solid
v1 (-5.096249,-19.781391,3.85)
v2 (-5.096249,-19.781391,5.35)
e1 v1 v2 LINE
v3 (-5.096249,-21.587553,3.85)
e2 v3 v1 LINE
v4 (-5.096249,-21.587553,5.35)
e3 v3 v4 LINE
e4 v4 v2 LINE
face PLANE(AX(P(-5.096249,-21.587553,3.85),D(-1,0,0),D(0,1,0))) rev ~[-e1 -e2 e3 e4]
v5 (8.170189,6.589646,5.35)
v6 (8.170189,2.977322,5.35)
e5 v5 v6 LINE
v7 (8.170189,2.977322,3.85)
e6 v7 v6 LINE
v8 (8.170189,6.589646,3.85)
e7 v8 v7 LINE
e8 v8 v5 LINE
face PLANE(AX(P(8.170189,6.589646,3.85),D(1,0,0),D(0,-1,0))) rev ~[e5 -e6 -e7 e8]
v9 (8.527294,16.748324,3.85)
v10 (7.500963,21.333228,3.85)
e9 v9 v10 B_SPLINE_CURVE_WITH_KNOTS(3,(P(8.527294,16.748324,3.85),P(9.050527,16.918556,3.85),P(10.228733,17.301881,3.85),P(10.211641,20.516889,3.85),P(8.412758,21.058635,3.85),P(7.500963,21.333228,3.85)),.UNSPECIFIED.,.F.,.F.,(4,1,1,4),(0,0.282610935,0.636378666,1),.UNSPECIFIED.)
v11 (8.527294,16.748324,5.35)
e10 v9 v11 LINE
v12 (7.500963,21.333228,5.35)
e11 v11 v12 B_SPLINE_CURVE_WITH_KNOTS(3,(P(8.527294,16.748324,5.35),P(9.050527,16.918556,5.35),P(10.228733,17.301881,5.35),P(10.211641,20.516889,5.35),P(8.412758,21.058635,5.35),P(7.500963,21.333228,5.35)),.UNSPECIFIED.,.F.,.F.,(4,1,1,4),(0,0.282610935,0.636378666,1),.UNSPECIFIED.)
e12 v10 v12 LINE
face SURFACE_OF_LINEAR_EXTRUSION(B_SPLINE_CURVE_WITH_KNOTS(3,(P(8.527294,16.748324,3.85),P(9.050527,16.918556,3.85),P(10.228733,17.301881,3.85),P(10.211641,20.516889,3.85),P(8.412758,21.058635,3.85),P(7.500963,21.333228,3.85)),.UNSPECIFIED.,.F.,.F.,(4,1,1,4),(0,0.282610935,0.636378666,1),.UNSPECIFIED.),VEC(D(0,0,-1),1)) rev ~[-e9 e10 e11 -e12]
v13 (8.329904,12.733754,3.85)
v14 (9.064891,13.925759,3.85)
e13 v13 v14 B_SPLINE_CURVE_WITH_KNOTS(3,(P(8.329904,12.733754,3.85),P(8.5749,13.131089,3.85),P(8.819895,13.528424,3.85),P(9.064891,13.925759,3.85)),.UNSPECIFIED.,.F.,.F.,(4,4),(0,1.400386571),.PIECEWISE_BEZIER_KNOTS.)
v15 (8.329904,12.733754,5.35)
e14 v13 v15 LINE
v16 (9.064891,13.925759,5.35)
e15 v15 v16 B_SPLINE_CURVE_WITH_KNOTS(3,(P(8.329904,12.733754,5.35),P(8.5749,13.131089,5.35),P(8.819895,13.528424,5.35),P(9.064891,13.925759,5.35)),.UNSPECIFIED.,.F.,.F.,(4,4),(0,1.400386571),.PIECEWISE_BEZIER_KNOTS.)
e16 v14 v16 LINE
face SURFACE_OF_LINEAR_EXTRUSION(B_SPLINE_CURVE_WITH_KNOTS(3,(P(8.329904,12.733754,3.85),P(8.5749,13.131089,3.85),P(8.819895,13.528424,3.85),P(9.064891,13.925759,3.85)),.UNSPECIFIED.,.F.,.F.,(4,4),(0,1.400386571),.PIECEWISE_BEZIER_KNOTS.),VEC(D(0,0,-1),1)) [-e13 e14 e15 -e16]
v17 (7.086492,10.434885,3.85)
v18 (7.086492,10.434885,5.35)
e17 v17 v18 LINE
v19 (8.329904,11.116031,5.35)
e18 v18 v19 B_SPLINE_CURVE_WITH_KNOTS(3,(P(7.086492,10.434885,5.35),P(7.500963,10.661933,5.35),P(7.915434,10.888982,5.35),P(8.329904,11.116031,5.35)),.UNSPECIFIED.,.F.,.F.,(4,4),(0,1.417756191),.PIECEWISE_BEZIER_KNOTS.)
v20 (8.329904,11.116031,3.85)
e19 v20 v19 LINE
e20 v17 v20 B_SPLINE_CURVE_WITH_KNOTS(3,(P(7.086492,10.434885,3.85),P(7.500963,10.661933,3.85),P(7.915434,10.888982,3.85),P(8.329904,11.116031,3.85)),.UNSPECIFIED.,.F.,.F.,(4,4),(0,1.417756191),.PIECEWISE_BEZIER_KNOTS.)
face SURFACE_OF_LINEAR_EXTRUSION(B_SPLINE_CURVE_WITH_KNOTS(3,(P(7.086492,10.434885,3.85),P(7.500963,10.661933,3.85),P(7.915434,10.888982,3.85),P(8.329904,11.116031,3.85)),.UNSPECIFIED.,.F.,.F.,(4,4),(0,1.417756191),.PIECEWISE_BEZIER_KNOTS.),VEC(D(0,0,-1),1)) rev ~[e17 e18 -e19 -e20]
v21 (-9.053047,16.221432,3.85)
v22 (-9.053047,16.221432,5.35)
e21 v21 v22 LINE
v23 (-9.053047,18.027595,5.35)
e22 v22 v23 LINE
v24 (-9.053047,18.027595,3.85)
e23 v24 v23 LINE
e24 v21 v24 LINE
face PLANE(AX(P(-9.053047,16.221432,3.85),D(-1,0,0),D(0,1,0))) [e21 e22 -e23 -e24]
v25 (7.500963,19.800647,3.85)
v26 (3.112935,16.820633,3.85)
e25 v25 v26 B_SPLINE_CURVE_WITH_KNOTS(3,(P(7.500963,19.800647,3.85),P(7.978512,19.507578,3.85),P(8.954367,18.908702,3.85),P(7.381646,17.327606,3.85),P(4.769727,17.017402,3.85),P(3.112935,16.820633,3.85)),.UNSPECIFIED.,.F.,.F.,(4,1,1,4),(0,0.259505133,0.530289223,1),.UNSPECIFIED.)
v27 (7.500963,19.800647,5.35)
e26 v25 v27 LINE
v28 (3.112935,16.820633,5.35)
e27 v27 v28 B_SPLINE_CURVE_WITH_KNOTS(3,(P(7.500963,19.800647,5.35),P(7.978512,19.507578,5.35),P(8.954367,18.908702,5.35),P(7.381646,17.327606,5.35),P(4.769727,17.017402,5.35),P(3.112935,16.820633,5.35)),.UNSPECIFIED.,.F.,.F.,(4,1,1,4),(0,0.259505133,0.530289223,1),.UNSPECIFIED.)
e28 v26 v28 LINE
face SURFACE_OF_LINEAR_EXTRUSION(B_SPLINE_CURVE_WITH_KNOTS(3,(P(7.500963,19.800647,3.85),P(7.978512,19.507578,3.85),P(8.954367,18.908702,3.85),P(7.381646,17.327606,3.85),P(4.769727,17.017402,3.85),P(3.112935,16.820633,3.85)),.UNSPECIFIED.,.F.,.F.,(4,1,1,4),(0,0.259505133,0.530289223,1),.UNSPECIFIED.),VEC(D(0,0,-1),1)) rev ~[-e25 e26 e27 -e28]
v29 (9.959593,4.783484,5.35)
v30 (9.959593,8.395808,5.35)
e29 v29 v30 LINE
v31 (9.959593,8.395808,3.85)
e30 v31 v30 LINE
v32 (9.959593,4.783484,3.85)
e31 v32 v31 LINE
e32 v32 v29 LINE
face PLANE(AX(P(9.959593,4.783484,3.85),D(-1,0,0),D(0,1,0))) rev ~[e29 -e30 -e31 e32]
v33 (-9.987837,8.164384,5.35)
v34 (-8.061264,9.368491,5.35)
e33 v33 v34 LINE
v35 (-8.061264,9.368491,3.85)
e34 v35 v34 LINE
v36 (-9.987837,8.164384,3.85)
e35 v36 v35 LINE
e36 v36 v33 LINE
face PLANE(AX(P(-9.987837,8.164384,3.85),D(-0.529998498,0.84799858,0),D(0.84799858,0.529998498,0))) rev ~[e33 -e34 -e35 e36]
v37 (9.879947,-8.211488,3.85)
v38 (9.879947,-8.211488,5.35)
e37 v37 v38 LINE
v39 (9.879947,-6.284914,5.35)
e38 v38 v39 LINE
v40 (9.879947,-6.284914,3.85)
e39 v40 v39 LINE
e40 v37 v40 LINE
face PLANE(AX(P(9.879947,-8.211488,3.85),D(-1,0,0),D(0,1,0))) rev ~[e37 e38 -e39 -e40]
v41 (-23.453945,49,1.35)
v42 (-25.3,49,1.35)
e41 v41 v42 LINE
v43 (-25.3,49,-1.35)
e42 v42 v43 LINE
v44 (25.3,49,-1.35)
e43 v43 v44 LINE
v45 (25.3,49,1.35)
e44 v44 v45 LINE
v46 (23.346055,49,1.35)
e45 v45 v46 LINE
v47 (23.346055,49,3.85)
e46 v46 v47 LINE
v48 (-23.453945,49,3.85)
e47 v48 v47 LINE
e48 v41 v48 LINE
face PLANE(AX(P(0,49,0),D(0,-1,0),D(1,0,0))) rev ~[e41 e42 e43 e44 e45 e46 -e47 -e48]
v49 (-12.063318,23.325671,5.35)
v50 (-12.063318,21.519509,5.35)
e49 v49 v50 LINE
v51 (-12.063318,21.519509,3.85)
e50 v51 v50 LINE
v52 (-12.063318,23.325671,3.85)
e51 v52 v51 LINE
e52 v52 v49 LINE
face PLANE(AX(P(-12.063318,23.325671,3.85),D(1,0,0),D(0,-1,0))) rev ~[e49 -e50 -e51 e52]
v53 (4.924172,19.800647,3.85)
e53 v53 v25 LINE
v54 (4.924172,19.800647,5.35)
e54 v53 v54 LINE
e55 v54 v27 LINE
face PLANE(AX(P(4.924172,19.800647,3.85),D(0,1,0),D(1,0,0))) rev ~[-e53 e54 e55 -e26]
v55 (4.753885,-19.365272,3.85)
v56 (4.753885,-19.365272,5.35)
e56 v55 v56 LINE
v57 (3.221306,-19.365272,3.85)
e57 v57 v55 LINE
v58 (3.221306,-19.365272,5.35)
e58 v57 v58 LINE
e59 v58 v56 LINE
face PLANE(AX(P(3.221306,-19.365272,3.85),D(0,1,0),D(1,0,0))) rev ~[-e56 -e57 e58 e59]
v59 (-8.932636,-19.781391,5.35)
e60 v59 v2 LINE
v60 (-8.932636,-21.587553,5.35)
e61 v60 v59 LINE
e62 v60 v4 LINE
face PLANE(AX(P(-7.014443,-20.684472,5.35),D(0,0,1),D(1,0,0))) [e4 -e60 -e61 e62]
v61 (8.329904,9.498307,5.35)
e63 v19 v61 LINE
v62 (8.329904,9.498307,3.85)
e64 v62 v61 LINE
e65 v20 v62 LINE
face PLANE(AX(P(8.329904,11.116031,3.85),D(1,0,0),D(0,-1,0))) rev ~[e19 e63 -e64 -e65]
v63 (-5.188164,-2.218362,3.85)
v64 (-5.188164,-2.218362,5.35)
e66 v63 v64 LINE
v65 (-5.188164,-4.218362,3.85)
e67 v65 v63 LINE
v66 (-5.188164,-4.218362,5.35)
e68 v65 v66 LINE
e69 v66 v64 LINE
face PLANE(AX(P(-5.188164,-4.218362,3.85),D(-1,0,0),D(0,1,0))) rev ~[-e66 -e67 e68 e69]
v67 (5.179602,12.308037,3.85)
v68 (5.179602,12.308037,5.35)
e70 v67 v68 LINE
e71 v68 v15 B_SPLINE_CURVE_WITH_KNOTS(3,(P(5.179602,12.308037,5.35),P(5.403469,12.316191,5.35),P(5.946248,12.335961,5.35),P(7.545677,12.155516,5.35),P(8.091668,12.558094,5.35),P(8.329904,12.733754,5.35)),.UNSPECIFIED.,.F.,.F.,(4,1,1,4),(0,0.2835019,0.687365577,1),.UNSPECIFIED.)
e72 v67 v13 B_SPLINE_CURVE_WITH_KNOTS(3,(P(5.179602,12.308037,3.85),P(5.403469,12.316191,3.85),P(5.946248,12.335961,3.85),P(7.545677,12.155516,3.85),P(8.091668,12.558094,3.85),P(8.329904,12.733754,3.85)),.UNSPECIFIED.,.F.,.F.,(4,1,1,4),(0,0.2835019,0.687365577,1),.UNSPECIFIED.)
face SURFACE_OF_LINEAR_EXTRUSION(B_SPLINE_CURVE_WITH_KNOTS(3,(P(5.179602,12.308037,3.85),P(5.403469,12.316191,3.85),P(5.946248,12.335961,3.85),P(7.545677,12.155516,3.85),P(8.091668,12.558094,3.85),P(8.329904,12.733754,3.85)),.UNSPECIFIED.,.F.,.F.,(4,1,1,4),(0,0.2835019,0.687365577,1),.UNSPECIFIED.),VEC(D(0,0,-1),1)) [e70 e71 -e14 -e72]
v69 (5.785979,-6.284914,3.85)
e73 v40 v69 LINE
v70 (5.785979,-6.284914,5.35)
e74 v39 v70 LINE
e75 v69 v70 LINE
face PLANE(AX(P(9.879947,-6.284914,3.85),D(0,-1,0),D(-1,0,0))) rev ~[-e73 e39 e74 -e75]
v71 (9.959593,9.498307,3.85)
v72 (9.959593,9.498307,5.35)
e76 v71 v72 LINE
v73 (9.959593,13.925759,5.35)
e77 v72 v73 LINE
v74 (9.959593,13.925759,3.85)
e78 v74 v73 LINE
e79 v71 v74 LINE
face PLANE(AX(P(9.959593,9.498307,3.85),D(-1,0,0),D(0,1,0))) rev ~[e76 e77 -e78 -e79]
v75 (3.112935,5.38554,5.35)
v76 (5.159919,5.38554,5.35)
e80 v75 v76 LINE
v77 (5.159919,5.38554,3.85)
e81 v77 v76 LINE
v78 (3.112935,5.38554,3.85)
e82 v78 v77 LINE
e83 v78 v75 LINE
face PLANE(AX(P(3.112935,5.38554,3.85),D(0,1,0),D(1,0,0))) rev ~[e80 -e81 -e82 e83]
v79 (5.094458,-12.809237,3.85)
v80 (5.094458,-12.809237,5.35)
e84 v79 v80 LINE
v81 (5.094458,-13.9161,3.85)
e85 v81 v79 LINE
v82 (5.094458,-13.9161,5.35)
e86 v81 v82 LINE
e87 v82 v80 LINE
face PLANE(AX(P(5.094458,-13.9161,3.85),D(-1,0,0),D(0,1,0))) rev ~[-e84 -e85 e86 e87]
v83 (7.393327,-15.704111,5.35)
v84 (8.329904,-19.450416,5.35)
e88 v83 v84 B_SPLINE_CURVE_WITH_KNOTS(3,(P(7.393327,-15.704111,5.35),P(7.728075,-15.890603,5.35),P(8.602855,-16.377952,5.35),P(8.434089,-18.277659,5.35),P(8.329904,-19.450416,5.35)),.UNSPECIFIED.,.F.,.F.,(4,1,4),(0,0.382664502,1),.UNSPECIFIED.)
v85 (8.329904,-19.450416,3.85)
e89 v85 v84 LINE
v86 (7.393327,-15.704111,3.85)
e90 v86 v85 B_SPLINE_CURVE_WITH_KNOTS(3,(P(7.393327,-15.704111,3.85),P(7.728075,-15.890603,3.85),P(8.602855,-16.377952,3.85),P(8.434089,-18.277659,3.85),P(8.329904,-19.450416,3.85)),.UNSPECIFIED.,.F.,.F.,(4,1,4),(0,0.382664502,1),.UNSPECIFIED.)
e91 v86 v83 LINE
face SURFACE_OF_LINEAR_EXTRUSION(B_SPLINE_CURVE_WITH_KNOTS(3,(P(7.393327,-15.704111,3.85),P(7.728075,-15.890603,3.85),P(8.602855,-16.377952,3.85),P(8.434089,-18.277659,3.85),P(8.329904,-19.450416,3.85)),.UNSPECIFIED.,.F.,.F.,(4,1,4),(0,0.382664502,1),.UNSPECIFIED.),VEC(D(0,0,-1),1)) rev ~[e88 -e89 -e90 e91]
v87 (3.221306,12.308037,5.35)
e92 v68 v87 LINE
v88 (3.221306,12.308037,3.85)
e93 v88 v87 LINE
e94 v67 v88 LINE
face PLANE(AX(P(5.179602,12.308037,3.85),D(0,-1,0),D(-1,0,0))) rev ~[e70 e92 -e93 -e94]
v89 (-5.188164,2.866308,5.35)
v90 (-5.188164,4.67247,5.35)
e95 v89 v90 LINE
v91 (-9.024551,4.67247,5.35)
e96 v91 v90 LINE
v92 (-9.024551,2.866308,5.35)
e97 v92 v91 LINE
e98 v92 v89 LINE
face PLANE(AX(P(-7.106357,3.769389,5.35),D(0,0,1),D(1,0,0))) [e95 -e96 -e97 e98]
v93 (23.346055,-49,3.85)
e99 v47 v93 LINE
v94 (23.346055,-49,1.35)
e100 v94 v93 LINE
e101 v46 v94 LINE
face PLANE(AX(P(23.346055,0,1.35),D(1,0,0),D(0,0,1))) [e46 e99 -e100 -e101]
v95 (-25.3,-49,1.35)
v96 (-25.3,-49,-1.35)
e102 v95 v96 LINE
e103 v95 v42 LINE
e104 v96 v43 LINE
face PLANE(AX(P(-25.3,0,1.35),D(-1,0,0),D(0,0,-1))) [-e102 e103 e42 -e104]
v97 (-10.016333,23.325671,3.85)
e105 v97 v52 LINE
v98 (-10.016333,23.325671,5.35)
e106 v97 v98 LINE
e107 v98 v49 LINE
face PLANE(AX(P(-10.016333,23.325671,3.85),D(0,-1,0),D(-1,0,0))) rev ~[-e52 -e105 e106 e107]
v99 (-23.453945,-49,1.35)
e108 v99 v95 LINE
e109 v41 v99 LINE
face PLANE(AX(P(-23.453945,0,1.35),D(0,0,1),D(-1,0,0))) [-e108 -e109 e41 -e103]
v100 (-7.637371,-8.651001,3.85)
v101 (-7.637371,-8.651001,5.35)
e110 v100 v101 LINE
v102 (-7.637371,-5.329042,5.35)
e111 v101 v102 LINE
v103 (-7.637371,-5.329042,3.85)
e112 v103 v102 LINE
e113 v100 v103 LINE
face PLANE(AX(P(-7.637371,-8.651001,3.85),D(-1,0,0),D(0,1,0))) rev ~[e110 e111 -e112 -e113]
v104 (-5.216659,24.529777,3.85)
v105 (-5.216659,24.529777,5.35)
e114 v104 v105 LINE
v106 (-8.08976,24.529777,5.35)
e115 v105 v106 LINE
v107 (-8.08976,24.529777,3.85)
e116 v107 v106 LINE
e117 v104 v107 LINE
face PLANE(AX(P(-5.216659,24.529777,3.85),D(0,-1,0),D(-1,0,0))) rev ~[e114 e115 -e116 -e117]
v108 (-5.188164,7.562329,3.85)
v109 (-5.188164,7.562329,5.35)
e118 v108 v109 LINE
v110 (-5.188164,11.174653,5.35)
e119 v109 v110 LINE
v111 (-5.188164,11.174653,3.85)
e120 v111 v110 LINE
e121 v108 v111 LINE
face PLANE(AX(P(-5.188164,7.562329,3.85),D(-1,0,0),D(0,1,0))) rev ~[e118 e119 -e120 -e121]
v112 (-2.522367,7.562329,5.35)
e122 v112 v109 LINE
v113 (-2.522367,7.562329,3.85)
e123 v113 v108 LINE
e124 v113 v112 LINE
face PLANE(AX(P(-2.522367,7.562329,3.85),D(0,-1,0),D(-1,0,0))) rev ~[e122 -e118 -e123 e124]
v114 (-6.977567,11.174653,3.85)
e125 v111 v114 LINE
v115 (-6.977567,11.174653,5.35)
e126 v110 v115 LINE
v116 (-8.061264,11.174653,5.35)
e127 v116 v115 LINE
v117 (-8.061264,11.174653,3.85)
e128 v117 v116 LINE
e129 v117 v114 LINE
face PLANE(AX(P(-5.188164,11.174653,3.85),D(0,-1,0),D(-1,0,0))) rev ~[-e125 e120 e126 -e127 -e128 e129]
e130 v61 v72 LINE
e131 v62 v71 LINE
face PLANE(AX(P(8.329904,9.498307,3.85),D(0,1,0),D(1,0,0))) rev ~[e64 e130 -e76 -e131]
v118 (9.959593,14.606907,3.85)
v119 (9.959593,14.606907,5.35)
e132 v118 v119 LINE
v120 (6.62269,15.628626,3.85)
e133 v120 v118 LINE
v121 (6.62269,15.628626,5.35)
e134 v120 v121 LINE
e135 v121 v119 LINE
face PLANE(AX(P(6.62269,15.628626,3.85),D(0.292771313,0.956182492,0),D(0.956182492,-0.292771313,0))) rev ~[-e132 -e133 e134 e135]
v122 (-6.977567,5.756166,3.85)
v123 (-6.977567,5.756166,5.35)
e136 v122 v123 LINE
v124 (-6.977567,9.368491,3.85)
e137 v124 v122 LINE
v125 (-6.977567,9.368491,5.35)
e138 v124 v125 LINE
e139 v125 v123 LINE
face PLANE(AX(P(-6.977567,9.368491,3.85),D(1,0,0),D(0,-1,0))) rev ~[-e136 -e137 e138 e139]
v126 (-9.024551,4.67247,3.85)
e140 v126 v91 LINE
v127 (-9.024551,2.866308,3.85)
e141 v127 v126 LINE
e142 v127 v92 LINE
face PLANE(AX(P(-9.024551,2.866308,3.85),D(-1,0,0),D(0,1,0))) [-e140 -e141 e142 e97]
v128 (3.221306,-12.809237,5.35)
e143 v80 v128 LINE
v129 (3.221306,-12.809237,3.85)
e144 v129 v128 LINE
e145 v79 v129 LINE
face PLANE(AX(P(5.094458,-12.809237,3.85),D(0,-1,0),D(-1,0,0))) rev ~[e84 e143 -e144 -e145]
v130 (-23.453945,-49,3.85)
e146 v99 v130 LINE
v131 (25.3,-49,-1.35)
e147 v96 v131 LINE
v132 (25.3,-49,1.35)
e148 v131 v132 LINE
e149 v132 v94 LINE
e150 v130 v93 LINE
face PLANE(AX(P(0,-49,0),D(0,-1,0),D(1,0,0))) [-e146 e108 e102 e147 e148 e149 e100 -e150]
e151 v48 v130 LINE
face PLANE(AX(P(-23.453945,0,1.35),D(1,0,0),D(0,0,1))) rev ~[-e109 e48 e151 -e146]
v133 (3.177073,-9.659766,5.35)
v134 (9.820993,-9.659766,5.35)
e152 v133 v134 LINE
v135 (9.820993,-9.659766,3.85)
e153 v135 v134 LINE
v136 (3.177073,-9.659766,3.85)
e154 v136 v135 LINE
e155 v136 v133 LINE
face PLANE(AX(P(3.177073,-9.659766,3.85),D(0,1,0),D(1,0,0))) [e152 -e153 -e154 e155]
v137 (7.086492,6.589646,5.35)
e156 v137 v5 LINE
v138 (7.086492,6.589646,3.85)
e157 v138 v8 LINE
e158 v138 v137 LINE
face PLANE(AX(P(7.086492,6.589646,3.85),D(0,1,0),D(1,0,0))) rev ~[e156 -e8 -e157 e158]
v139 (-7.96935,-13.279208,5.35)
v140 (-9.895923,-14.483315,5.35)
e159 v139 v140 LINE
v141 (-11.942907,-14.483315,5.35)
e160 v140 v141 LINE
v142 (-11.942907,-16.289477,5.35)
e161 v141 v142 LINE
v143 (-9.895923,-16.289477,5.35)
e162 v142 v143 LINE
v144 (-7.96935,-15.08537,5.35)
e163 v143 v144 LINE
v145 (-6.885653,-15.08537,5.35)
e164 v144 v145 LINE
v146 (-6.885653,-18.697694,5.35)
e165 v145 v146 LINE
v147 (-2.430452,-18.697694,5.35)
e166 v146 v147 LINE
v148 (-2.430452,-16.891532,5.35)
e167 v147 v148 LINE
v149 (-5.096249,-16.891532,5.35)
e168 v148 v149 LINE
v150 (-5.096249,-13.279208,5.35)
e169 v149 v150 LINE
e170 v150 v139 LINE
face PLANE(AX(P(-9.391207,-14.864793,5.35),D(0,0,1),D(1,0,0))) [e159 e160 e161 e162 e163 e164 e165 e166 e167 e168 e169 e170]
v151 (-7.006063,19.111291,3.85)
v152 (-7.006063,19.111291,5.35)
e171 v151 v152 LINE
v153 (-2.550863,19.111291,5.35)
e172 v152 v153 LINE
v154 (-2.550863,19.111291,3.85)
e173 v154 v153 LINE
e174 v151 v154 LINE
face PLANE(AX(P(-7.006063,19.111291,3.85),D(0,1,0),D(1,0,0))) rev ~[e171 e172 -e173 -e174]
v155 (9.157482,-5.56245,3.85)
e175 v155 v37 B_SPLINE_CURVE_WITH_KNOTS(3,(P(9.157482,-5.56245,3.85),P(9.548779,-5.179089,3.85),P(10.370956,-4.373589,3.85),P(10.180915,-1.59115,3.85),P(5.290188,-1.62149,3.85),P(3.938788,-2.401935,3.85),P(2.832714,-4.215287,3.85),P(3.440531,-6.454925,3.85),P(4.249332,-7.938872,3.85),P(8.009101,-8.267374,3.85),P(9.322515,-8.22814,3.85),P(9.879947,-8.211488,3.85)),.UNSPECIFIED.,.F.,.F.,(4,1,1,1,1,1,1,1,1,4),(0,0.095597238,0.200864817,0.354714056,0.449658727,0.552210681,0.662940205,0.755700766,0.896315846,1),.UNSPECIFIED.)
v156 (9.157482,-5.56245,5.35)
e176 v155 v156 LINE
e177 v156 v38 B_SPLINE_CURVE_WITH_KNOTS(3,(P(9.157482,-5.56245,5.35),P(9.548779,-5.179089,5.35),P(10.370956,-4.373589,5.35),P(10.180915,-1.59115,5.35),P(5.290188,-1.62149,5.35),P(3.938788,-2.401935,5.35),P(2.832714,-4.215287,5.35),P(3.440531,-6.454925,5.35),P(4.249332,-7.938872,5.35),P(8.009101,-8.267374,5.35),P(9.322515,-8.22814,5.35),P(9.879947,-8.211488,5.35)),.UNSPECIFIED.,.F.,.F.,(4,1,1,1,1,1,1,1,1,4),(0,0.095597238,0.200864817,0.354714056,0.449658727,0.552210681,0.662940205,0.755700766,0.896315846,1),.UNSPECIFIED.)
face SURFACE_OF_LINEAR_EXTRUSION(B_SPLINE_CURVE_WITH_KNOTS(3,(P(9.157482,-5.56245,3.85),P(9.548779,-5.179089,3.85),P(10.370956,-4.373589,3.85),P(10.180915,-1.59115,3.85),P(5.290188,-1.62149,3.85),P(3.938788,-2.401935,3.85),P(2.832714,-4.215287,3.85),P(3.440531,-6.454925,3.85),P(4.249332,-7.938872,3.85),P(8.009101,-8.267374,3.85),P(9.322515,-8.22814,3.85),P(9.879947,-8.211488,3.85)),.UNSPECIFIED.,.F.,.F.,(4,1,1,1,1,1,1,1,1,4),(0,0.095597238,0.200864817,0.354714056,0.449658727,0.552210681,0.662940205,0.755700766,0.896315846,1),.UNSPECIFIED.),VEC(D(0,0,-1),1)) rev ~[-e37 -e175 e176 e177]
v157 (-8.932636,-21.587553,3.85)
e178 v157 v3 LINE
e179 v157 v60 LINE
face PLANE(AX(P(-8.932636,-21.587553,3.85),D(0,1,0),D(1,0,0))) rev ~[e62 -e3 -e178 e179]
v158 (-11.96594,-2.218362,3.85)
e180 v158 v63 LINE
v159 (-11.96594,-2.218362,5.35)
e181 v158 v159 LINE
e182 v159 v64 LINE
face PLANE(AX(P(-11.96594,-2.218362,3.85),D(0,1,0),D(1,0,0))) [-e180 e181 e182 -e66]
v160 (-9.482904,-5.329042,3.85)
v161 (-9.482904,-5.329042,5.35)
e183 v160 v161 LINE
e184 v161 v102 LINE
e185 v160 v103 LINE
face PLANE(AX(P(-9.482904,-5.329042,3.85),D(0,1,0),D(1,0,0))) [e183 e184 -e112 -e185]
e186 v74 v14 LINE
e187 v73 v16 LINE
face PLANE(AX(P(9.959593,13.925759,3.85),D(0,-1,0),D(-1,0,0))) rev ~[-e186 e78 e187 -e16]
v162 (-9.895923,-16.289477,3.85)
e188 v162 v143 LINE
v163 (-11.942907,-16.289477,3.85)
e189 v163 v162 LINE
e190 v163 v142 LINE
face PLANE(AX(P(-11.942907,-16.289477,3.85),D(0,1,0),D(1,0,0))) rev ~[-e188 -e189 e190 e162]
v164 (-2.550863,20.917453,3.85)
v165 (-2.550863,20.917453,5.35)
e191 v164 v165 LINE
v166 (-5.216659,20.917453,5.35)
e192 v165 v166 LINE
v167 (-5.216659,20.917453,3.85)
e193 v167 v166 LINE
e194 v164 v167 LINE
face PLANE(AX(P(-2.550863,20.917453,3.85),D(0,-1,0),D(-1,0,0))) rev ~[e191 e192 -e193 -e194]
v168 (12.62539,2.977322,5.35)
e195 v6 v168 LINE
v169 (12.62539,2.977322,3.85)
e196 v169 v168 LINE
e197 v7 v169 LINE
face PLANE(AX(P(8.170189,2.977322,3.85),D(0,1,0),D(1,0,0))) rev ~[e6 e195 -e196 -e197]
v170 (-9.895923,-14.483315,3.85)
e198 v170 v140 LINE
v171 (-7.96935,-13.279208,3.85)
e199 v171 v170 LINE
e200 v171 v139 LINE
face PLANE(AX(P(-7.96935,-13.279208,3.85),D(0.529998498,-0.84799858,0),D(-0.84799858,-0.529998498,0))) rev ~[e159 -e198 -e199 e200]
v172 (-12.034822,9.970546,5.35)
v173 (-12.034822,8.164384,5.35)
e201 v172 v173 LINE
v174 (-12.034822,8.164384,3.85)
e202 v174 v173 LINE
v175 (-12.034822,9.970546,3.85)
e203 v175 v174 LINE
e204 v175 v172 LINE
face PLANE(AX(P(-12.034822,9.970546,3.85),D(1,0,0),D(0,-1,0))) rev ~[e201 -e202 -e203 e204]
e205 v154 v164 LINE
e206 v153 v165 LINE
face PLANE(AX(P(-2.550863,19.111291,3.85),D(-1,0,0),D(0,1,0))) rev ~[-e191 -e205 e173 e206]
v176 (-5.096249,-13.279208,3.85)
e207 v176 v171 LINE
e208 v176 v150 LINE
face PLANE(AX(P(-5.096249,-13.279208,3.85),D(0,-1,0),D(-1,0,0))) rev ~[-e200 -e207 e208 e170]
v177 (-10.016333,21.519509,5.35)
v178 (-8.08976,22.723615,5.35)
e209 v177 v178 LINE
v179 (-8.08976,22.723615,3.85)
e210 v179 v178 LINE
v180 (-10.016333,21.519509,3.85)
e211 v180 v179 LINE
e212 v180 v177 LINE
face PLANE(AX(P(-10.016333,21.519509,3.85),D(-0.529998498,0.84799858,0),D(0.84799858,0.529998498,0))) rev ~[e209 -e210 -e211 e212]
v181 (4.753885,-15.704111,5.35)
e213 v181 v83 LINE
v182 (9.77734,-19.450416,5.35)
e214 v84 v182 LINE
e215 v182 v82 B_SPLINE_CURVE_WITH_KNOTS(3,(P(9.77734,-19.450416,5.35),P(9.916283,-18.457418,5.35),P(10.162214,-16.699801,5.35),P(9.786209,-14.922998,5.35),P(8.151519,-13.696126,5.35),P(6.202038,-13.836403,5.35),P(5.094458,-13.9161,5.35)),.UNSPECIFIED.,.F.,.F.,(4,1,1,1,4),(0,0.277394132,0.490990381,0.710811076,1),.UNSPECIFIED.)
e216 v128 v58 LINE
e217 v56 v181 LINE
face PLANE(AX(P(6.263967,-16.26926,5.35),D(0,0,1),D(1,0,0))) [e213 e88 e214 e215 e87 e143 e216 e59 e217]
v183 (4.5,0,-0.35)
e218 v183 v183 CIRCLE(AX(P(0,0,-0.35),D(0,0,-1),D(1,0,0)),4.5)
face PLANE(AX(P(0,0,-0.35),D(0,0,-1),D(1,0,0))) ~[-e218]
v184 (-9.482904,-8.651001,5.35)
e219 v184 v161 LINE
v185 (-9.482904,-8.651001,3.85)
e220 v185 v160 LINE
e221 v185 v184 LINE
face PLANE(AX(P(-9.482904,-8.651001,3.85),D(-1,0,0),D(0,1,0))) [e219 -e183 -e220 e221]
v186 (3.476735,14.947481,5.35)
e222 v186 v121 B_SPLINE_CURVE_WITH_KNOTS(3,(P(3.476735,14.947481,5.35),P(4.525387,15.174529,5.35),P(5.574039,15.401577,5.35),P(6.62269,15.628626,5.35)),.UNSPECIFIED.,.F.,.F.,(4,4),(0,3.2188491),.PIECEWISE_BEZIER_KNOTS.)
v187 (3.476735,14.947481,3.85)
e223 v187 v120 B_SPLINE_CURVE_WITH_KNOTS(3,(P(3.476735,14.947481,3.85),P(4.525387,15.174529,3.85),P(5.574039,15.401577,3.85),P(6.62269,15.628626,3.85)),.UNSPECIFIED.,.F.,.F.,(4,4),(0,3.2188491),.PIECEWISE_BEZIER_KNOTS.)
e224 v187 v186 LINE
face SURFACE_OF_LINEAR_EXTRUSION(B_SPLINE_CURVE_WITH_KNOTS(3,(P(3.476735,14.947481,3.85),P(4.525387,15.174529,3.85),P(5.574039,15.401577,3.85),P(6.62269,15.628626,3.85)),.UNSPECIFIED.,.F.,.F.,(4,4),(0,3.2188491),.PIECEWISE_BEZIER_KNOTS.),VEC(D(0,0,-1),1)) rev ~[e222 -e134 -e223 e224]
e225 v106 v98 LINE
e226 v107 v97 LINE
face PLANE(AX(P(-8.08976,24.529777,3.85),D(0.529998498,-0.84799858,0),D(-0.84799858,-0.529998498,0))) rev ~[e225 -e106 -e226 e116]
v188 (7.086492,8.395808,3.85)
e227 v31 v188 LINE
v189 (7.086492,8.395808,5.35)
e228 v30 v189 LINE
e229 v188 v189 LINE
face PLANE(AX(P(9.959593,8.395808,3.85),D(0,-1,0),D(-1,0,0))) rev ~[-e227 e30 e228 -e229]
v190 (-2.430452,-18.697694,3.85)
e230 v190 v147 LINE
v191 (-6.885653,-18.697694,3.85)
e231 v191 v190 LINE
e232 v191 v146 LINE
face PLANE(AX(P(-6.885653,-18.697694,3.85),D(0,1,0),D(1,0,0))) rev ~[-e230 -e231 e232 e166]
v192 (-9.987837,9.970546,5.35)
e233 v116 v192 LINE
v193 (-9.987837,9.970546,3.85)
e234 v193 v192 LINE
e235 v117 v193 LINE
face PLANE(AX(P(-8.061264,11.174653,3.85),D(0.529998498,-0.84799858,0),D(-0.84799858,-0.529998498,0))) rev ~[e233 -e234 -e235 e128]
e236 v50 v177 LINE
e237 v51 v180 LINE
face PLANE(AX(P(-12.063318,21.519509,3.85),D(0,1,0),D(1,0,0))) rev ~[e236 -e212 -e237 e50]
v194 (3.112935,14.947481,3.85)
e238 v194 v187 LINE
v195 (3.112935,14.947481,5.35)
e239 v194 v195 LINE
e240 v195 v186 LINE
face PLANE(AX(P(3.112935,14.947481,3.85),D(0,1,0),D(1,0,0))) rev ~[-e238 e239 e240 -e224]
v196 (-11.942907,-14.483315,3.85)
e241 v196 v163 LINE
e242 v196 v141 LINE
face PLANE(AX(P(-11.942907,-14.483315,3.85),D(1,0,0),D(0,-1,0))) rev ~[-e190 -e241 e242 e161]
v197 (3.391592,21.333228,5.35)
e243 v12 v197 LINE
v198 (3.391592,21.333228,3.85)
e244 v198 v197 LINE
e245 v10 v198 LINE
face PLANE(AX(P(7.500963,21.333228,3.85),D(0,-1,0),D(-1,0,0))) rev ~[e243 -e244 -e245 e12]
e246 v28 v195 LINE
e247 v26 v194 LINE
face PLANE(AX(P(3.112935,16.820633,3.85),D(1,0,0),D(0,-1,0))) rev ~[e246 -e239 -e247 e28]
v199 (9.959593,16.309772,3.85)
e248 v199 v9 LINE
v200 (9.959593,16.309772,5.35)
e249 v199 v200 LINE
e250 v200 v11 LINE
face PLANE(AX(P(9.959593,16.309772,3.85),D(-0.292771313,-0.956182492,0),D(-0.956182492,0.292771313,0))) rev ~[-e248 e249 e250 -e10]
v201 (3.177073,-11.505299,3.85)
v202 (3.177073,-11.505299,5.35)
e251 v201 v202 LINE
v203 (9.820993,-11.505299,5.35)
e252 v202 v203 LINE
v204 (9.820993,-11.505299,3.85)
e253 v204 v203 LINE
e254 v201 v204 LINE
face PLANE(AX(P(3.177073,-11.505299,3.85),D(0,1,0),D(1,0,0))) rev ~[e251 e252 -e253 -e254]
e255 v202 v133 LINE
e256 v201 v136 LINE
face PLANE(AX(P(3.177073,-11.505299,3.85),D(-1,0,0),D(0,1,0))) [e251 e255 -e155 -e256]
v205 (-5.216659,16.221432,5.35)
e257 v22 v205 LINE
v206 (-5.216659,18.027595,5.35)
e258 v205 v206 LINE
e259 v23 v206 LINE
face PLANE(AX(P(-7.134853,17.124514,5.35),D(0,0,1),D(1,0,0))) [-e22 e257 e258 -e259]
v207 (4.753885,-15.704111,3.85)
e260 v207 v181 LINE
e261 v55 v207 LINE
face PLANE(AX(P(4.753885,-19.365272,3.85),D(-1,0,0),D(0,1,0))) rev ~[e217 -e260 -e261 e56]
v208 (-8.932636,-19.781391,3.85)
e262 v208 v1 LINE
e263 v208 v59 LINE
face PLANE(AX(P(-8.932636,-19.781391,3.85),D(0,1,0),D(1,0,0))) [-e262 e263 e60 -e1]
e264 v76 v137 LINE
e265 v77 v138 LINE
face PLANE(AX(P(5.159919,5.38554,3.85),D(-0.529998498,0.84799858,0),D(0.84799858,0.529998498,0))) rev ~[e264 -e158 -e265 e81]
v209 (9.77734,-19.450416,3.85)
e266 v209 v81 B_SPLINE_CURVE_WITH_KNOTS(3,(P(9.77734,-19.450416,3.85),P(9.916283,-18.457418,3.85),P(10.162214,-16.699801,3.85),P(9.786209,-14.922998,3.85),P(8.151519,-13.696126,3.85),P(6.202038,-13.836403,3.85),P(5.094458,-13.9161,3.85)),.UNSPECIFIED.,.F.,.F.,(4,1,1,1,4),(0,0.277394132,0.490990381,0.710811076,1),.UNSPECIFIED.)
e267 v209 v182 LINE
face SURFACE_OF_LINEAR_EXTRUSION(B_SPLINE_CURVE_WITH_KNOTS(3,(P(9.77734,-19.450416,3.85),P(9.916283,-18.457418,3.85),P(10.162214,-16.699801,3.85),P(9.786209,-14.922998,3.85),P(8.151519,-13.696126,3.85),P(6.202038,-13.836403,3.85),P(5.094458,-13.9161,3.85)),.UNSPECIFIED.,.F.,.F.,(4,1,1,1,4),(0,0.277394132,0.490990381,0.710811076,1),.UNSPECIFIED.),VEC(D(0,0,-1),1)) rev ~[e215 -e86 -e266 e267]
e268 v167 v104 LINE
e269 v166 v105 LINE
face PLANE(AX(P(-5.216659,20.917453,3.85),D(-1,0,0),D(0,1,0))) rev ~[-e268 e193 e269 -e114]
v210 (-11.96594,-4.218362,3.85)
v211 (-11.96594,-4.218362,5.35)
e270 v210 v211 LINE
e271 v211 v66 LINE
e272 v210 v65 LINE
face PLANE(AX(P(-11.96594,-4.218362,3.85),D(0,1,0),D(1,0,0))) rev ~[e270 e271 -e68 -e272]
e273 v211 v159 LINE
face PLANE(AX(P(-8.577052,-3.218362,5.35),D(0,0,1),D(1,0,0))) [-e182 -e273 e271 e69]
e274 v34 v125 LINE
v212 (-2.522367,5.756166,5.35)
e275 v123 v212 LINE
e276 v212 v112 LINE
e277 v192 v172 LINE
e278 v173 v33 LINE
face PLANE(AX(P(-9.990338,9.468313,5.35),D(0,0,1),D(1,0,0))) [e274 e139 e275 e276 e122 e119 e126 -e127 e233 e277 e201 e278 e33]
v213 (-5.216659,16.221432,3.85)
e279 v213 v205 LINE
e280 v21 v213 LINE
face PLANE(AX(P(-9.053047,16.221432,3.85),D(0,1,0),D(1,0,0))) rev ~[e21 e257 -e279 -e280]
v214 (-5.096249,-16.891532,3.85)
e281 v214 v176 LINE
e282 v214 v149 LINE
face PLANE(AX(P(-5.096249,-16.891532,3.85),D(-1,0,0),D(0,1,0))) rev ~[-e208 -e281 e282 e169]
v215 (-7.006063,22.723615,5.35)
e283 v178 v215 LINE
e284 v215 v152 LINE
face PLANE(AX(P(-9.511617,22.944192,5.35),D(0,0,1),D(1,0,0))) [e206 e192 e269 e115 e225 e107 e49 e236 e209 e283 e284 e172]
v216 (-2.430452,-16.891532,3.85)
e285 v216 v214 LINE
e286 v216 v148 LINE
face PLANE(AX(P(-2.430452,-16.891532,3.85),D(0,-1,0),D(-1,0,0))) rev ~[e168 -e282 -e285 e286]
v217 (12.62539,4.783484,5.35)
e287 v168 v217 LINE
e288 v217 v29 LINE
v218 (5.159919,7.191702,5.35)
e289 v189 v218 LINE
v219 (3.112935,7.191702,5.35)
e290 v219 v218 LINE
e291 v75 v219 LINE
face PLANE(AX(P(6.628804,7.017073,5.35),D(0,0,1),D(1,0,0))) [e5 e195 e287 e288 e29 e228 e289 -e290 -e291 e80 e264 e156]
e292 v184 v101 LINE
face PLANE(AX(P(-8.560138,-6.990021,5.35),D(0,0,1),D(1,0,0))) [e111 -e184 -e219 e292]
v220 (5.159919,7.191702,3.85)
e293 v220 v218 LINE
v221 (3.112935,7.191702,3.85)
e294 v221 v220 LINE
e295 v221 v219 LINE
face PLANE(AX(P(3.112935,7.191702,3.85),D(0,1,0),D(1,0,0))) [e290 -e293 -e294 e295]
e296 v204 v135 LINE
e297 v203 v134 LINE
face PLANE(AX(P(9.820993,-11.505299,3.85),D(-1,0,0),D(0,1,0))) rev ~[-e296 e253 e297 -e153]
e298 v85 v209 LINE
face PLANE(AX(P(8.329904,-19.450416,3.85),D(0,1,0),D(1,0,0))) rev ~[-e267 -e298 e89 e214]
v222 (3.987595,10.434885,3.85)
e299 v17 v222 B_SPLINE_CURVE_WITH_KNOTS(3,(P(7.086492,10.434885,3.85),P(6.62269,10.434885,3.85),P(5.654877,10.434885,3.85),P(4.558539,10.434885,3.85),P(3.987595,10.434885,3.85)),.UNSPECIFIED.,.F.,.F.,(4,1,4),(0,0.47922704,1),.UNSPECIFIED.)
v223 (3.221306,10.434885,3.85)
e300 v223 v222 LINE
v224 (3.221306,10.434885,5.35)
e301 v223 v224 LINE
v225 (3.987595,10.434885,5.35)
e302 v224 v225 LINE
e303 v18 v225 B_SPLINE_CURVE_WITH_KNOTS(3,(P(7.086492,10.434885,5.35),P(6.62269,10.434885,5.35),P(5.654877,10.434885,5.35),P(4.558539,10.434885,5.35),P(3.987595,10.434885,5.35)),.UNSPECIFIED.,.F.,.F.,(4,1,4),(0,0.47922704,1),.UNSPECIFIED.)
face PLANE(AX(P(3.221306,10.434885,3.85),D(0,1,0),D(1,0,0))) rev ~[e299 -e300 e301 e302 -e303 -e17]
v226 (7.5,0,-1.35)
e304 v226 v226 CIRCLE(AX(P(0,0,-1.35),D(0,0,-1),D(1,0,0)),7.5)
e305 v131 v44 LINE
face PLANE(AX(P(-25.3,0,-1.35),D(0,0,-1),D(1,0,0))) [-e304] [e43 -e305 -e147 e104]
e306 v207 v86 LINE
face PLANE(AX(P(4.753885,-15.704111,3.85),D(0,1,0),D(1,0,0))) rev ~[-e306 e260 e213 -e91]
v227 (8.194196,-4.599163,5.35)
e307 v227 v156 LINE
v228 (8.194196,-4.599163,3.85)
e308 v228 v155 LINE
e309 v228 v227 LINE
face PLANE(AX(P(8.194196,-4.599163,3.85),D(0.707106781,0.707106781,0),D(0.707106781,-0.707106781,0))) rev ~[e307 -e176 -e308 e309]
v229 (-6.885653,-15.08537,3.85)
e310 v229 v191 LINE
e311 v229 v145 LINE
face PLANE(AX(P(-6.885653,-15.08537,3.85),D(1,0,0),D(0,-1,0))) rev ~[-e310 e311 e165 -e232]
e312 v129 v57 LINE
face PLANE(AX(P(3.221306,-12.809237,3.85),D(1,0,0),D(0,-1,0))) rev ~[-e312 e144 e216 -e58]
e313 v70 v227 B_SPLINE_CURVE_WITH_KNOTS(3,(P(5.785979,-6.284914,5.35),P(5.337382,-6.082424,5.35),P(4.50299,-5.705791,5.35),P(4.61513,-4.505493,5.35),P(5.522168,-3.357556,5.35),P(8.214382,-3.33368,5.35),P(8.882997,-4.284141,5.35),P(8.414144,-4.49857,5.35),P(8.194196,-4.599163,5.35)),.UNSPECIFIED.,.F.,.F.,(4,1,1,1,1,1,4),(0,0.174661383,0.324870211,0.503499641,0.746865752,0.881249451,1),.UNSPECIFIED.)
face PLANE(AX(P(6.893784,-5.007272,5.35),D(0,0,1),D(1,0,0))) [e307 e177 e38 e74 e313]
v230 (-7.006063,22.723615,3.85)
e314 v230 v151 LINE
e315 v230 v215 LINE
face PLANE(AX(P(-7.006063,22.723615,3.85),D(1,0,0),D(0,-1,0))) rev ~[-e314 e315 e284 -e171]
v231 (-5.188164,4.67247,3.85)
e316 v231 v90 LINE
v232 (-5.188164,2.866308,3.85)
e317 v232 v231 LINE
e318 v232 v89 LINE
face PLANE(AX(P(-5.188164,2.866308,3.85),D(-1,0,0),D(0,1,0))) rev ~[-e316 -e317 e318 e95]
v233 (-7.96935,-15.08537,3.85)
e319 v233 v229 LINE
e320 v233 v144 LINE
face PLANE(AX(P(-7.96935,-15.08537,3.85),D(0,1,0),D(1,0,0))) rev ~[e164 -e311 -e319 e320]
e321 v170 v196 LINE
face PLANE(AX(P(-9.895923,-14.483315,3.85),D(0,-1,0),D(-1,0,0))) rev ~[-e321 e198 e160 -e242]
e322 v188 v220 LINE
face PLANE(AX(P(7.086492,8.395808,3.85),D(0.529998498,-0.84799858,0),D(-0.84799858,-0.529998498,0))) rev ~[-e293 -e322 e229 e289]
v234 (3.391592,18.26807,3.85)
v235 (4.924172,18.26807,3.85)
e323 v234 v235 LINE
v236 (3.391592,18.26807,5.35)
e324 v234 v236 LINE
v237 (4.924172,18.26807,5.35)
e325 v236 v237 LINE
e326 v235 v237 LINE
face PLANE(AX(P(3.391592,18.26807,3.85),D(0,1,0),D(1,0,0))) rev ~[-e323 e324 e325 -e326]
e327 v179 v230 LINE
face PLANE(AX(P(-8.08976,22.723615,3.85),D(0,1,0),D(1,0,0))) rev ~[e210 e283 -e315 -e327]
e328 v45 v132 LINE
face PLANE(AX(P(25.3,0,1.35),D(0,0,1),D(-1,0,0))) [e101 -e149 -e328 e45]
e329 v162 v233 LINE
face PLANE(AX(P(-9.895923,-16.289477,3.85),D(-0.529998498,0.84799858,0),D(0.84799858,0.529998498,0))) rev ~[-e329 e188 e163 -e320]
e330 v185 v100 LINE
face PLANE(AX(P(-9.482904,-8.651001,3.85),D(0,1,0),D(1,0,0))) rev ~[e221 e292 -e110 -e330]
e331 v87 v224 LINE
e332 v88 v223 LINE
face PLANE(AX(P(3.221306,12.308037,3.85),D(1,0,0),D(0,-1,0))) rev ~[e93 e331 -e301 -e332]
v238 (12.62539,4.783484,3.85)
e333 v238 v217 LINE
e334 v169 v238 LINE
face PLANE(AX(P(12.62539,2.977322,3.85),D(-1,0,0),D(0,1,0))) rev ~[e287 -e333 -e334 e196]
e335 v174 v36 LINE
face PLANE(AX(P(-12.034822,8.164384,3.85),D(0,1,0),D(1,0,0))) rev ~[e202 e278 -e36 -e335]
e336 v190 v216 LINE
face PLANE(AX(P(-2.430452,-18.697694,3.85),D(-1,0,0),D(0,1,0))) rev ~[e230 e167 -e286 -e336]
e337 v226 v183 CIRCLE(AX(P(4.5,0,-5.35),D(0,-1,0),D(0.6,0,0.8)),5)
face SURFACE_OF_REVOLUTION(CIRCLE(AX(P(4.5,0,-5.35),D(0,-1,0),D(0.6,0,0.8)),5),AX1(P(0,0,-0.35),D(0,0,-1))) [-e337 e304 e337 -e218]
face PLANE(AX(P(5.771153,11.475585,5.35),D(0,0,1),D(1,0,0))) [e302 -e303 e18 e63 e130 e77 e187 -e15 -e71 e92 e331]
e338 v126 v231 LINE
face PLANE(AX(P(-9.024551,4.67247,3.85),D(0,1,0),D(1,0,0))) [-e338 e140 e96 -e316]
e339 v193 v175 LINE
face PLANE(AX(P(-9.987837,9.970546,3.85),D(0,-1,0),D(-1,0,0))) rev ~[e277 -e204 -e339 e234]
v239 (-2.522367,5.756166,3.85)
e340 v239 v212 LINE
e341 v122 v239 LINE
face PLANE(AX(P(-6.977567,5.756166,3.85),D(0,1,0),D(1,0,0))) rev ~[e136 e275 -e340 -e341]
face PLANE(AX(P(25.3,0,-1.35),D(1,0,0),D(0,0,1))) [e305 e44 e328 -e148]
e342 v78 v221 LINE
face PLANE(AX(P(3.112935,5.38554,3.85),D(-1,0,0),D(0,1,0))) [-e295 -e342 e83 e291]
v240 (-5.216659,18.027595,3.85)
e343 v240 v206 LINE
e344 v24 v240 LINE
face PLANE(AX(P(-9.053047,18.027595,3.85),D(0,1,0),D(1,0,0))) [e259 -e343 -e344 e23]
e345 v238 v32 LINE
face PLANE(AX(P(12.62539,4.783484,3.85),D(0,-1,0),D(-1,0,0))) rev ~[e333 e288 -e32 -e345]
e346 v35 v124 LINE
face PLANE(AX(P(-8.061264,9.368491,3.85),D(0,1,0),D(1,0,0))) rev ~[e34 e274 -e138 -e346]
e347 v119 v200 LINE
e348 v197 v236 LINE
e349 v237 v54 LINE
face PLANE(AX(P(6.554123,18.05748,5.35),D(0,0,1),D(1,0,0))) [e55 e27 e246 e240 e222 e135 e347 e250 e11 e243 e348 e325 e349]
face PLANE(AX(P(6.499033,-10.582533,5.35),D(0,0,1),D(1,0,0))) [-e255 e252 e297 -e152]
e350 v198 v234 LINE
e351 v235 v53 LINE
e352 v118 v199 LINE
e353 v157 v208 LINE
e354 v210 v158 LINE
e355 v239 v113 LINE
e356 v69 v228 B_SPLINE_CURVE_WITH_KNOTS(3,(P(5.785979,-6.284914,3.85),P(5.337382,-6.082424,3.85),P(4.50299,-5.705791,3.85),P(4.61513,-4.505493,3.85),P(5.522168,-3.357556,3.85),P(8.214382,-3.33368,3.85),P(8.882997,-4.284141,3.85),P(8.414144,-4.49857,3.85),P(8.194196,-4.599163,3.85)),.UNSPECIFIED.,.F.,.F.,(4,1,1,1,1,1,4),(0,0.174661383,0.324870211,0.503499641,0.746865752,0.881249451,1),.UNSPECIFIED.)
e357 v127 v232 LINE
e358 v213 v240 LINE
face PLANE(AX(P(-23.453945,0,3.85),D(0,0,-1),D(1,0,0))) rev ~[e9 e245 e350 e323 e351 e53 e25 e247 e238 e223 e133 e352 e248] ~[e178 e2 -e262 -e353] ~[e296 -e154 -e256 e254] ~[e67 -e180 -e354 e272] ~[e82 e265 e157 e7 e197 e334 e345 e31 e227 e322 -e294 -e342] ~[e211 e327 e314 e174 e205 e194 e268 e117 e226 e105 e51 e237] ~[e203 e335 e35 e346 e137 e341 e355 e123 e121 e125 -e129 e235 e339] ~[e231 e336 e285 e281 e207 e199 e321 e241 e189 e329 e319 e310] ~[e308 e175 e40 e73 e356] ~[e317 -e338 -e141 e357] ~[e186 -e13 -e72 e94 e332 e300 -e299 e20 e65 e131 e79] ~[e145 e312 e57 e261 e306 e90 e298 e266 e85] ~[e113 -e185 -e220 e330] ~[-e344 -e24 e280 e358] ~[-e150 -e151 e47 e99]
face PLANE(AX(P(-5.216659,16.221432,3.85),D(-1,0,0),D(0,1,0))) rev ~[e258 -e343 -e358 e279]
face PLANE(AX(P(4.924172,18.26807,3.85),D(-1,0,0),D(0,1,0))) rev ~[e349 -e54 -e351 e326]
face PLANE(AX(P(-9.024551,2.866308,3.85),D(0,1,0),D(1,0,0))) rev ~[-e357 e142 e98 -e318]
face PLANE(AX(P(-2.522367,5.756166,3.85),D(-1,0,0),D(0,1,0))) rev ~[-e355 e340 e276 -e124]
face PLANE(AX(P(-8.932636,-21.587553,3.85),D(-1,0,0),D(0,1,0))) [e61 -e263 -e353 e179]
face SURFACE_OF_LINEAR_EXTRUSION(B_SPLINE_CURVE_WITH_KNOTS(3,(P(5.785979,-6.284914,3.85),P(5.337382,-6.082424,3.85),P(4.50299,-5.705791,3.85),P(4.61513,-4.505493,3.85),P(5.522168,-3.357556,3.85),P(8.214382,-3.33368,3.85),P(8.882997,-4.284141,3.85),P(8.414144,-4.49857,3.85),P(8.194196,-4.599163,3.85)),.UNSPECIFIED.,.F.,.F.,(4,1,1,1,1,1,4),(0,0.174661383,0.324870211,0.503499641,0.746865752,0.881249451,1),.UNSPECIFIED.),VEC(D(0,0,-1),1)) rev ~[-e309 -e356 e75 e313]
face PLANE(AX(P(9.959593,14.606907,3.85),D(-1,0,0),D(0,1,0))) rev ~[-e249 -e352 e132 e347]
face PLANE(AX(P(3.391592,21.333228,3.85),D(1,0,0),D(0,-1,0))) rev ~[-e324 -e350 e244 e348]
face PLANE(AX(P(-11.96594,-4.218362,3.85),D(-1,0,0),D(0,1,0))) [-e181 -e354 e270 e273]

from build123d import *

# Parameters (mm, degrees)
F0_W     = 46.8
F0_H     = 2.5
F1_DEPTH = 49
F2_W     = 7.5
F2_H     = 1
F5_W     = 2.0469846204
F5_H     = 1.8061620649
F5_W_2   = 6.6439194979
F5_H_2   = 1.8455331939
F5_W_3   = 3.8363870533
F5_H_3   = 1.8061622977
F5_W_4   = 1.0836967267
F5_W_5   = 6.7777763455
F5_H_4   = 2
F5_W_6   = 1.8455331939
F5_H_5   = 3.3219597489
F6_DEPTH = 1.5


# Not quite as in the source:
# - a fillet or chamfer that OpenCascade refuses, or shapes differently, is made with other operations: its cross-section is extruded or revolved along the edge and cut away or added


with BuildPart() as f1:
    # F0 (on Front) → F1 (new body, symmetric)
    with BuildSketch(Plane.XZ):
        Polygon((25.3, -1.35), (25.3, 1.35), (23.3460554371, 1.35), (-23.4539445629, 1.35), (-25.3, 1.35), (-25.3, -1.35), align=None)
        with Locations((-0.0539445629, 2.6)):
            Rectangle(F0_W, F0_H)
    extrude(amount=F1_DEPTH, both=True)

    # F2 (on Front) → F3 (revolve, cut)
    with BuildSketch(Plane.XZ):
        with Locations((3.75, -0.85)):
            Rectangle(F2_W, F2_H)
    revolve(axis=Axis((0, 0, -0.85), (0, 0, -1)), mode=Mode.SUBTRACT)

    # F4: fillet of radius 5 on 1 edges, made by hand

    # F4_s1 → F4_t2 (revolve)
    with BuildSketch(Plane.XZ):
        with BuildLine():
            ThreePointArc((7.5, -1.35), (6.0811388301, -0.6065835097), (4.5, -0.35))
            Line((4.5, -0.35), (7.5, -0.35))
            Line((7.5, -0.35), (7.5, -1.35))
        make_face()
    revolve(axis=Axis((0, 0, -0.35), (0, 0, -1)))

    # F5 (on face) → F6 (join)
    with BuildSketch(Plane.XY.offset(3.85)):
        with BuildLine():
            Line((4.9241716042, 19.8006471619), (7.5009630335, 19.8006471619))
            add(Edge.make_bspline(
                [(7.5009630335, 19.8006471619), (7.9785124596, 19.5075781217), (8.9543671976, 18.9087022865), (7.3816458851, 17.3276064651), (4.7697273037, 17.0174018652), (3.1129348501, 16.8206328526)],
                knots=[0, 0, 0, 0, 0.2595051335, 0.5302892228, 1, 1, 1, 1], degree=3))
            Line((3.1129348501, 16.8206328526), (3.1129348501, 14.9474805221))
            Line((3.1129348501, 14.9474805221), (3.4767354373, 14.9474805221))
            add(Edge.make_bspline(
                [(3.4767354373, 14.9474805221), (4.5253869977, 15.1745288943), (5.5740385582, 15.4015772666), (6.6226901187, 15.6286256388)],
                knots=[0, 0, 0, 0, 3.2188490998, 3.2188490998, 3.2188490998, 3.2188490998], degree=3))
            Line((6.6226901187, 15.6286256388), (9.9595930205, 14.6069070324))
            Line((9.9595930205, 14.6069070324), (9.9595930205, 16.3097716868))
            Line((9.9595930205, 16.3097716868), (8.527294053, 16.7483240055))
            add(Edge.make_bspline(
                [(8.527294053, 16.7483240055), (9.0505266558, 16.9185557016), (10.2287332466, 17.301880642), (10.2116405832, 20.5168892904), (8.4127583201, 21.0586346497), (7.5009630335, 21.3332278654)],
                knots=[0, 0, 0, 0, 0.2826109345, 0.6363786658, 1, 1, 1, 1], degree=3))
            Line((7.5009630335, 21.3332278654), (3.3915922977, 21.3332278654))
            Line((3.3915922977, 21.3332278654), (3.3915922977, 18.2680701837))
            Line((3.3915922977, 18.2680701837), (4.9241716042, 18.2680701837))
            Line((4.9241716042, 18.2680701837), (4.9241716042, 19.8006471619))
        make_face()
        with BuildLine():
            Line((5.1796017215, 12.3080369085), (3.2213055529, 12.3080369085))
            Line((3.2213055529, 12.3080369085), (3.2213055529, 10.434884578))
            Line((3.2213055529, 10.434884578), (3.987595439, 10.434884578))
            add(Edge.make_bspline(
                [(7.0864924639, 10.434884578), (6.6226901187, 10.434884578), (5.6548767314, 10.434884578), (4.5585386607, 10.434884578), (3.987595439, 10.434884578)],
                knots=[0, 0, 0, 0, 0.4792270404, 1, 1, 1, 1], degree=3))
            add(Edge.make_bspline(
                [(7.0864924639, 10.434884578), (7.5009630335, 10.6619332607), (7.915433603, 10.8889819433), (8.3299041726, 11.116030626)],
                knots=[0, 0, 0, 0, 1.4177561906, 1.4177561906, 1.4177561906, 1.4177561906], degree=3))
            Line((8.3299041726, 11.116030626), (8.3299041726, 12.7337537706))
            add(Edge.make_bspline(
                [(5.1796017215, 12.3080369085), (5.4034691903, 12.3161910935), (5.946247887, 12.3359613528), (7.5456770883, 12.1555160266), (8.0916682054, 12.558094155), (8.3299041726, 12.7337537706)],
                knots=[0, 0, 0, 0, 0.2835019002, 0.6873655771, 1, 1, 1, 1], degree=3))
        make_face()
        with BuildLine():
            add(Edge.make_bspline(
                [(8.3299041726, 12.7337537706), (8.5748998169, 13.1310888877), (8.8198954612, 13.5284240047), (9.0648911056, 13.9257591218)],
                knots=[0, 0, 0, 0, 1.4003865712, 1.4003865712, 1.4003865712, 1.4003865712], degree=3))
            Line((8.3299041726, 12.7337537706), (8.3299041726, 11.116030626))
            Line((8.3299041726, 11.116030626), (8.3299041726, 9.4983074814))
            Line((8.3299041726, 9.4983074814), (9.0648911056, 9.4983074814))
            Line((9.0648911056, 9.4983074814), (9.9595930205, 9.4983074814))
            Line((9.9595930205, 9.4983074814), (9.9595930205, 13.9257591218))
            Line((9.9595930205, 13.9257591218), (9.0648911056, 13.9257591218))
        make_face()
        Polygon((8.1701891906, 8.3958084671), (7.0864924639, 8.3958084671), (5.1599194705, 7.1917017432), (5.1599194705, 5.3855396783), (7.0864924639, 6.5896464022), (8.1701891906, 6.5896464022), align=None)
        with Locations((4.1364271603, 6.2886207107)):
            Rectangle(F5_W, F5_H)
        Polygon((9.9595930205, 8.3958084671), (8.1701891906, 8.3958084671), (8.1701891906, 6.5896464022), (8.1701891906, 4.7834843373), (9.9595930205, 4.7834843373), align=None)
        Polygon((12.62538982, 4.7834843373), (9.9595930205, 4.7834843373), (8.1701891906, 4.7834843373), (8.1701891906, 2.9773220395), (12.62538982, 2.9773220395), align=None)
        with BuildLine():
            Line((8.1941955723, -4.5991633087), (9.157482069, -5.5624498054))
            add(Edge.make_bspline(
                [(9.157482069, -5.5624498054), (9.5487792454, -5.1790893624), (10.3709560961, -4.3735888355), (10.1809148183, -1.5911495575), (5.2901881268, -1.6214904462), (3.9387879664, -2.4019349259), (2.8327143669, -4.2152866088), (3.4405306211, -6.4549250287), (4.2493320025, -7.9388718891), (8.0091011439, -8.2673740434), (9.3225151381, -8.2281395815), (9.8799471743, -8.2114879042)],
                knots=[0, 0, 0, 0, 0.0955972377, 0.2008648172, 0.3547140558, 0.449658727, 0.5522106806, 0.6629402054, 0.7557007662, 0.8963158456, 1, 1, 1, 1], degree=3))
            Line((9.8799471743, -8.2114879042), (9.8799471743, -6.2849144451))
            Line((9.8799471743, -6.2849144451), (9.639125783, -6.2849144451))
            Line((9.639125783, -6.2849144451), (5.7859793305, -6.2849144451))
            add(Edge.make_bspline(
                [(5.7859793305, -6.2849144451), (5.3373815573, -6.0824238319), (4.5029895973, -5.7057912452), (4.6151304787, -4.5054927526), (5.5221677114, -3.357555761), (8.2143823017, -3.3336799886), (8.8829973904, -4.2841414137), (8.4141443171, -4.4985702665), (8.1941955723, -4.5991633087)],
                knots=[0, 0, 0, 0, 0.1746613826, 0.3248702113, 0.5034996406, 0.7468657523, 0.8812494506, 1, 1, 1, 1], degree=3))
        make_face()
        with Locations((6.4990330953, -10.5825328623)):
            Rectangle(F5_W_2, F5_H_2)
        with BuildLine():
            Line((5.094458349, -12.8092374653), (3.2213055529, -12.8092374653))
            Line((3.2213055529, -12.8092374653), (3.2213055529, -19.3652724847))
            Line((3.2213055529, -19.3652724847), (4.753885325, -19.3652724847))
            Line((4.753885325, -19.3652724847), (4.753885325, -15.7041111961))
            Line((4.753885325, -15.7041111961), (7.393327076, -15.7041111961))
            add(Edge.make_bspline(
                [(7.393327076, -15.7041111961), (7.7280745564, -15.8906025071), (8.6028551514, -16.3779518959), (8.4340893146, -18.2776591394), (8.3299041726, -19.4504158571)],
                knots=[0, 0, 0, 0, 0.3826645017, 1, 1, 1, 1], degree=3))
            Line((8.3299041726, -19.4504158571), (9.777339641, -19.4504158571))
            add(Edge.make_bspline(
                [(9.777339641, -19.4504158571), (9.916282957, -18.4574178062), (10.1622140126, -16.6998013476), (9.7862090494, -14.9229979542), (8.1515194, -13.6961261057), (6.2020376655, -13.8364032587), (5.094458349, -13.9161003754)],
                knots=[0, 0, 0, 0, 0.2773941316, 0.4909903808, 0.7108110755, 1, 1, 1, 1], degree=3))
            Line((5.094458349, -13.9161003754), (5.094458349, -12.8092374653))
        make_face()
        Polygon((-8.0897600321, 22.7236154125), (-7.0060633053, 22.7236154125), (-7.0060633053, 24.5297774774), (-8.0897600321, 24.5297774774), (-10.0163330255, 23.3256707535), (-12.0633176458, 23.3256707535), (-12.0633176458, 21.5195086886), (-10.0163330255, 21.5195086886), align=None)
        Polygon((-7.0060633053, 20.9174533476), (-5.2166594755, 20.9174533476), (-5.2166594755, 24.5297774774), (-7.0060633053, 24.5297774774), (-7.0060633053, 22.7236154125), align=None)
        Polygon((-7.0060633053, 19.1112910499), (-2.550862676, 19.1112910499), (-2.550862676, 20.9174533476), (-5.2166594755, 20.9174533476), (-7.0060633053, 20.9174533476), align=None)
        with Locations((-7.1348530021, 17.1245136399)):
            Rectangle(F5_W_3, F5_H_3)
        Polygon((-9.9878371693, 8.1643839367), (-8.0612641759, 9.3684906606), (-8.0612641759, 11.1746527255), (-9.9878371693, 9.9705460016), (-12.0348217897, 9.9705460016), (-12.0348217897, 8.1643839367), align=None)
        with Locations((-7.5194158126, 10.271571693)):
            Rectangle(F5_W_4, F5_H)
        Polygon((-6.9775674492, 9.3684906606), (-6.9775674492, 7.5623285957), (-5.1881636194, 7.5623285957), (-5.1881636194, 11.1746527255), (-6.9775674492, 11.1746527255), align=None)
        Polygon((-6.9775674492, 5.7561662979), (-2.5223668199, 5.7561662979), (-2.5223668199, 7.5623285957), (-5.1881636194, 7.5623285957), (-6.9775674492, 7.5623285957), align=None)
        with Locations((-7.106357146, 3.769388888)):
            Rectangle(F5_W_3, F5_H_3)
        with Locations((-8.5770517921, -3.2183615263)):
            Rectangle(F5_W_5, F5_H_4)
        with Locations((-8.560137578, -6.9900213829)):
            Rectangle(F5_W_6, F5_H_5)
        Polygon((-7.969349802, -15.0853700369), (-6.8856530753, -15.0853700369), (-6.8856530753, -13.279207972), (-7.969349802, -13.279207972), (-9.8959227954, -14.4833146959), (-11.9429074158, -14.4833146959), (-11.9429074158, -16.2894767608), (-9.8959227954, -16.2894767608), align=None)
        Polygon((-6.8856530753, -15.0853700369), (-6.8856530753, -16.8915321018), (-5.0962492455, -16.8915321018), (-5.0962492455, -13.279207972), (-6.8856530753, -13.279207972), align=None)
        Polygon((-6.8856530753, -18.6976943995), (-2.430452446, -18.6976943995), (-2.430452446, -16.8915321018), (-5.0962492455, -16.8915321018), (-6.8856530753, -16.8915321018), align=None)
        with Locations((-7.0144427721, -20.6844718094)):
            Rectangle(F5_W_3, F5_H_3)
    extrude(amount=F6_DEPTH)


solid = f1.part
